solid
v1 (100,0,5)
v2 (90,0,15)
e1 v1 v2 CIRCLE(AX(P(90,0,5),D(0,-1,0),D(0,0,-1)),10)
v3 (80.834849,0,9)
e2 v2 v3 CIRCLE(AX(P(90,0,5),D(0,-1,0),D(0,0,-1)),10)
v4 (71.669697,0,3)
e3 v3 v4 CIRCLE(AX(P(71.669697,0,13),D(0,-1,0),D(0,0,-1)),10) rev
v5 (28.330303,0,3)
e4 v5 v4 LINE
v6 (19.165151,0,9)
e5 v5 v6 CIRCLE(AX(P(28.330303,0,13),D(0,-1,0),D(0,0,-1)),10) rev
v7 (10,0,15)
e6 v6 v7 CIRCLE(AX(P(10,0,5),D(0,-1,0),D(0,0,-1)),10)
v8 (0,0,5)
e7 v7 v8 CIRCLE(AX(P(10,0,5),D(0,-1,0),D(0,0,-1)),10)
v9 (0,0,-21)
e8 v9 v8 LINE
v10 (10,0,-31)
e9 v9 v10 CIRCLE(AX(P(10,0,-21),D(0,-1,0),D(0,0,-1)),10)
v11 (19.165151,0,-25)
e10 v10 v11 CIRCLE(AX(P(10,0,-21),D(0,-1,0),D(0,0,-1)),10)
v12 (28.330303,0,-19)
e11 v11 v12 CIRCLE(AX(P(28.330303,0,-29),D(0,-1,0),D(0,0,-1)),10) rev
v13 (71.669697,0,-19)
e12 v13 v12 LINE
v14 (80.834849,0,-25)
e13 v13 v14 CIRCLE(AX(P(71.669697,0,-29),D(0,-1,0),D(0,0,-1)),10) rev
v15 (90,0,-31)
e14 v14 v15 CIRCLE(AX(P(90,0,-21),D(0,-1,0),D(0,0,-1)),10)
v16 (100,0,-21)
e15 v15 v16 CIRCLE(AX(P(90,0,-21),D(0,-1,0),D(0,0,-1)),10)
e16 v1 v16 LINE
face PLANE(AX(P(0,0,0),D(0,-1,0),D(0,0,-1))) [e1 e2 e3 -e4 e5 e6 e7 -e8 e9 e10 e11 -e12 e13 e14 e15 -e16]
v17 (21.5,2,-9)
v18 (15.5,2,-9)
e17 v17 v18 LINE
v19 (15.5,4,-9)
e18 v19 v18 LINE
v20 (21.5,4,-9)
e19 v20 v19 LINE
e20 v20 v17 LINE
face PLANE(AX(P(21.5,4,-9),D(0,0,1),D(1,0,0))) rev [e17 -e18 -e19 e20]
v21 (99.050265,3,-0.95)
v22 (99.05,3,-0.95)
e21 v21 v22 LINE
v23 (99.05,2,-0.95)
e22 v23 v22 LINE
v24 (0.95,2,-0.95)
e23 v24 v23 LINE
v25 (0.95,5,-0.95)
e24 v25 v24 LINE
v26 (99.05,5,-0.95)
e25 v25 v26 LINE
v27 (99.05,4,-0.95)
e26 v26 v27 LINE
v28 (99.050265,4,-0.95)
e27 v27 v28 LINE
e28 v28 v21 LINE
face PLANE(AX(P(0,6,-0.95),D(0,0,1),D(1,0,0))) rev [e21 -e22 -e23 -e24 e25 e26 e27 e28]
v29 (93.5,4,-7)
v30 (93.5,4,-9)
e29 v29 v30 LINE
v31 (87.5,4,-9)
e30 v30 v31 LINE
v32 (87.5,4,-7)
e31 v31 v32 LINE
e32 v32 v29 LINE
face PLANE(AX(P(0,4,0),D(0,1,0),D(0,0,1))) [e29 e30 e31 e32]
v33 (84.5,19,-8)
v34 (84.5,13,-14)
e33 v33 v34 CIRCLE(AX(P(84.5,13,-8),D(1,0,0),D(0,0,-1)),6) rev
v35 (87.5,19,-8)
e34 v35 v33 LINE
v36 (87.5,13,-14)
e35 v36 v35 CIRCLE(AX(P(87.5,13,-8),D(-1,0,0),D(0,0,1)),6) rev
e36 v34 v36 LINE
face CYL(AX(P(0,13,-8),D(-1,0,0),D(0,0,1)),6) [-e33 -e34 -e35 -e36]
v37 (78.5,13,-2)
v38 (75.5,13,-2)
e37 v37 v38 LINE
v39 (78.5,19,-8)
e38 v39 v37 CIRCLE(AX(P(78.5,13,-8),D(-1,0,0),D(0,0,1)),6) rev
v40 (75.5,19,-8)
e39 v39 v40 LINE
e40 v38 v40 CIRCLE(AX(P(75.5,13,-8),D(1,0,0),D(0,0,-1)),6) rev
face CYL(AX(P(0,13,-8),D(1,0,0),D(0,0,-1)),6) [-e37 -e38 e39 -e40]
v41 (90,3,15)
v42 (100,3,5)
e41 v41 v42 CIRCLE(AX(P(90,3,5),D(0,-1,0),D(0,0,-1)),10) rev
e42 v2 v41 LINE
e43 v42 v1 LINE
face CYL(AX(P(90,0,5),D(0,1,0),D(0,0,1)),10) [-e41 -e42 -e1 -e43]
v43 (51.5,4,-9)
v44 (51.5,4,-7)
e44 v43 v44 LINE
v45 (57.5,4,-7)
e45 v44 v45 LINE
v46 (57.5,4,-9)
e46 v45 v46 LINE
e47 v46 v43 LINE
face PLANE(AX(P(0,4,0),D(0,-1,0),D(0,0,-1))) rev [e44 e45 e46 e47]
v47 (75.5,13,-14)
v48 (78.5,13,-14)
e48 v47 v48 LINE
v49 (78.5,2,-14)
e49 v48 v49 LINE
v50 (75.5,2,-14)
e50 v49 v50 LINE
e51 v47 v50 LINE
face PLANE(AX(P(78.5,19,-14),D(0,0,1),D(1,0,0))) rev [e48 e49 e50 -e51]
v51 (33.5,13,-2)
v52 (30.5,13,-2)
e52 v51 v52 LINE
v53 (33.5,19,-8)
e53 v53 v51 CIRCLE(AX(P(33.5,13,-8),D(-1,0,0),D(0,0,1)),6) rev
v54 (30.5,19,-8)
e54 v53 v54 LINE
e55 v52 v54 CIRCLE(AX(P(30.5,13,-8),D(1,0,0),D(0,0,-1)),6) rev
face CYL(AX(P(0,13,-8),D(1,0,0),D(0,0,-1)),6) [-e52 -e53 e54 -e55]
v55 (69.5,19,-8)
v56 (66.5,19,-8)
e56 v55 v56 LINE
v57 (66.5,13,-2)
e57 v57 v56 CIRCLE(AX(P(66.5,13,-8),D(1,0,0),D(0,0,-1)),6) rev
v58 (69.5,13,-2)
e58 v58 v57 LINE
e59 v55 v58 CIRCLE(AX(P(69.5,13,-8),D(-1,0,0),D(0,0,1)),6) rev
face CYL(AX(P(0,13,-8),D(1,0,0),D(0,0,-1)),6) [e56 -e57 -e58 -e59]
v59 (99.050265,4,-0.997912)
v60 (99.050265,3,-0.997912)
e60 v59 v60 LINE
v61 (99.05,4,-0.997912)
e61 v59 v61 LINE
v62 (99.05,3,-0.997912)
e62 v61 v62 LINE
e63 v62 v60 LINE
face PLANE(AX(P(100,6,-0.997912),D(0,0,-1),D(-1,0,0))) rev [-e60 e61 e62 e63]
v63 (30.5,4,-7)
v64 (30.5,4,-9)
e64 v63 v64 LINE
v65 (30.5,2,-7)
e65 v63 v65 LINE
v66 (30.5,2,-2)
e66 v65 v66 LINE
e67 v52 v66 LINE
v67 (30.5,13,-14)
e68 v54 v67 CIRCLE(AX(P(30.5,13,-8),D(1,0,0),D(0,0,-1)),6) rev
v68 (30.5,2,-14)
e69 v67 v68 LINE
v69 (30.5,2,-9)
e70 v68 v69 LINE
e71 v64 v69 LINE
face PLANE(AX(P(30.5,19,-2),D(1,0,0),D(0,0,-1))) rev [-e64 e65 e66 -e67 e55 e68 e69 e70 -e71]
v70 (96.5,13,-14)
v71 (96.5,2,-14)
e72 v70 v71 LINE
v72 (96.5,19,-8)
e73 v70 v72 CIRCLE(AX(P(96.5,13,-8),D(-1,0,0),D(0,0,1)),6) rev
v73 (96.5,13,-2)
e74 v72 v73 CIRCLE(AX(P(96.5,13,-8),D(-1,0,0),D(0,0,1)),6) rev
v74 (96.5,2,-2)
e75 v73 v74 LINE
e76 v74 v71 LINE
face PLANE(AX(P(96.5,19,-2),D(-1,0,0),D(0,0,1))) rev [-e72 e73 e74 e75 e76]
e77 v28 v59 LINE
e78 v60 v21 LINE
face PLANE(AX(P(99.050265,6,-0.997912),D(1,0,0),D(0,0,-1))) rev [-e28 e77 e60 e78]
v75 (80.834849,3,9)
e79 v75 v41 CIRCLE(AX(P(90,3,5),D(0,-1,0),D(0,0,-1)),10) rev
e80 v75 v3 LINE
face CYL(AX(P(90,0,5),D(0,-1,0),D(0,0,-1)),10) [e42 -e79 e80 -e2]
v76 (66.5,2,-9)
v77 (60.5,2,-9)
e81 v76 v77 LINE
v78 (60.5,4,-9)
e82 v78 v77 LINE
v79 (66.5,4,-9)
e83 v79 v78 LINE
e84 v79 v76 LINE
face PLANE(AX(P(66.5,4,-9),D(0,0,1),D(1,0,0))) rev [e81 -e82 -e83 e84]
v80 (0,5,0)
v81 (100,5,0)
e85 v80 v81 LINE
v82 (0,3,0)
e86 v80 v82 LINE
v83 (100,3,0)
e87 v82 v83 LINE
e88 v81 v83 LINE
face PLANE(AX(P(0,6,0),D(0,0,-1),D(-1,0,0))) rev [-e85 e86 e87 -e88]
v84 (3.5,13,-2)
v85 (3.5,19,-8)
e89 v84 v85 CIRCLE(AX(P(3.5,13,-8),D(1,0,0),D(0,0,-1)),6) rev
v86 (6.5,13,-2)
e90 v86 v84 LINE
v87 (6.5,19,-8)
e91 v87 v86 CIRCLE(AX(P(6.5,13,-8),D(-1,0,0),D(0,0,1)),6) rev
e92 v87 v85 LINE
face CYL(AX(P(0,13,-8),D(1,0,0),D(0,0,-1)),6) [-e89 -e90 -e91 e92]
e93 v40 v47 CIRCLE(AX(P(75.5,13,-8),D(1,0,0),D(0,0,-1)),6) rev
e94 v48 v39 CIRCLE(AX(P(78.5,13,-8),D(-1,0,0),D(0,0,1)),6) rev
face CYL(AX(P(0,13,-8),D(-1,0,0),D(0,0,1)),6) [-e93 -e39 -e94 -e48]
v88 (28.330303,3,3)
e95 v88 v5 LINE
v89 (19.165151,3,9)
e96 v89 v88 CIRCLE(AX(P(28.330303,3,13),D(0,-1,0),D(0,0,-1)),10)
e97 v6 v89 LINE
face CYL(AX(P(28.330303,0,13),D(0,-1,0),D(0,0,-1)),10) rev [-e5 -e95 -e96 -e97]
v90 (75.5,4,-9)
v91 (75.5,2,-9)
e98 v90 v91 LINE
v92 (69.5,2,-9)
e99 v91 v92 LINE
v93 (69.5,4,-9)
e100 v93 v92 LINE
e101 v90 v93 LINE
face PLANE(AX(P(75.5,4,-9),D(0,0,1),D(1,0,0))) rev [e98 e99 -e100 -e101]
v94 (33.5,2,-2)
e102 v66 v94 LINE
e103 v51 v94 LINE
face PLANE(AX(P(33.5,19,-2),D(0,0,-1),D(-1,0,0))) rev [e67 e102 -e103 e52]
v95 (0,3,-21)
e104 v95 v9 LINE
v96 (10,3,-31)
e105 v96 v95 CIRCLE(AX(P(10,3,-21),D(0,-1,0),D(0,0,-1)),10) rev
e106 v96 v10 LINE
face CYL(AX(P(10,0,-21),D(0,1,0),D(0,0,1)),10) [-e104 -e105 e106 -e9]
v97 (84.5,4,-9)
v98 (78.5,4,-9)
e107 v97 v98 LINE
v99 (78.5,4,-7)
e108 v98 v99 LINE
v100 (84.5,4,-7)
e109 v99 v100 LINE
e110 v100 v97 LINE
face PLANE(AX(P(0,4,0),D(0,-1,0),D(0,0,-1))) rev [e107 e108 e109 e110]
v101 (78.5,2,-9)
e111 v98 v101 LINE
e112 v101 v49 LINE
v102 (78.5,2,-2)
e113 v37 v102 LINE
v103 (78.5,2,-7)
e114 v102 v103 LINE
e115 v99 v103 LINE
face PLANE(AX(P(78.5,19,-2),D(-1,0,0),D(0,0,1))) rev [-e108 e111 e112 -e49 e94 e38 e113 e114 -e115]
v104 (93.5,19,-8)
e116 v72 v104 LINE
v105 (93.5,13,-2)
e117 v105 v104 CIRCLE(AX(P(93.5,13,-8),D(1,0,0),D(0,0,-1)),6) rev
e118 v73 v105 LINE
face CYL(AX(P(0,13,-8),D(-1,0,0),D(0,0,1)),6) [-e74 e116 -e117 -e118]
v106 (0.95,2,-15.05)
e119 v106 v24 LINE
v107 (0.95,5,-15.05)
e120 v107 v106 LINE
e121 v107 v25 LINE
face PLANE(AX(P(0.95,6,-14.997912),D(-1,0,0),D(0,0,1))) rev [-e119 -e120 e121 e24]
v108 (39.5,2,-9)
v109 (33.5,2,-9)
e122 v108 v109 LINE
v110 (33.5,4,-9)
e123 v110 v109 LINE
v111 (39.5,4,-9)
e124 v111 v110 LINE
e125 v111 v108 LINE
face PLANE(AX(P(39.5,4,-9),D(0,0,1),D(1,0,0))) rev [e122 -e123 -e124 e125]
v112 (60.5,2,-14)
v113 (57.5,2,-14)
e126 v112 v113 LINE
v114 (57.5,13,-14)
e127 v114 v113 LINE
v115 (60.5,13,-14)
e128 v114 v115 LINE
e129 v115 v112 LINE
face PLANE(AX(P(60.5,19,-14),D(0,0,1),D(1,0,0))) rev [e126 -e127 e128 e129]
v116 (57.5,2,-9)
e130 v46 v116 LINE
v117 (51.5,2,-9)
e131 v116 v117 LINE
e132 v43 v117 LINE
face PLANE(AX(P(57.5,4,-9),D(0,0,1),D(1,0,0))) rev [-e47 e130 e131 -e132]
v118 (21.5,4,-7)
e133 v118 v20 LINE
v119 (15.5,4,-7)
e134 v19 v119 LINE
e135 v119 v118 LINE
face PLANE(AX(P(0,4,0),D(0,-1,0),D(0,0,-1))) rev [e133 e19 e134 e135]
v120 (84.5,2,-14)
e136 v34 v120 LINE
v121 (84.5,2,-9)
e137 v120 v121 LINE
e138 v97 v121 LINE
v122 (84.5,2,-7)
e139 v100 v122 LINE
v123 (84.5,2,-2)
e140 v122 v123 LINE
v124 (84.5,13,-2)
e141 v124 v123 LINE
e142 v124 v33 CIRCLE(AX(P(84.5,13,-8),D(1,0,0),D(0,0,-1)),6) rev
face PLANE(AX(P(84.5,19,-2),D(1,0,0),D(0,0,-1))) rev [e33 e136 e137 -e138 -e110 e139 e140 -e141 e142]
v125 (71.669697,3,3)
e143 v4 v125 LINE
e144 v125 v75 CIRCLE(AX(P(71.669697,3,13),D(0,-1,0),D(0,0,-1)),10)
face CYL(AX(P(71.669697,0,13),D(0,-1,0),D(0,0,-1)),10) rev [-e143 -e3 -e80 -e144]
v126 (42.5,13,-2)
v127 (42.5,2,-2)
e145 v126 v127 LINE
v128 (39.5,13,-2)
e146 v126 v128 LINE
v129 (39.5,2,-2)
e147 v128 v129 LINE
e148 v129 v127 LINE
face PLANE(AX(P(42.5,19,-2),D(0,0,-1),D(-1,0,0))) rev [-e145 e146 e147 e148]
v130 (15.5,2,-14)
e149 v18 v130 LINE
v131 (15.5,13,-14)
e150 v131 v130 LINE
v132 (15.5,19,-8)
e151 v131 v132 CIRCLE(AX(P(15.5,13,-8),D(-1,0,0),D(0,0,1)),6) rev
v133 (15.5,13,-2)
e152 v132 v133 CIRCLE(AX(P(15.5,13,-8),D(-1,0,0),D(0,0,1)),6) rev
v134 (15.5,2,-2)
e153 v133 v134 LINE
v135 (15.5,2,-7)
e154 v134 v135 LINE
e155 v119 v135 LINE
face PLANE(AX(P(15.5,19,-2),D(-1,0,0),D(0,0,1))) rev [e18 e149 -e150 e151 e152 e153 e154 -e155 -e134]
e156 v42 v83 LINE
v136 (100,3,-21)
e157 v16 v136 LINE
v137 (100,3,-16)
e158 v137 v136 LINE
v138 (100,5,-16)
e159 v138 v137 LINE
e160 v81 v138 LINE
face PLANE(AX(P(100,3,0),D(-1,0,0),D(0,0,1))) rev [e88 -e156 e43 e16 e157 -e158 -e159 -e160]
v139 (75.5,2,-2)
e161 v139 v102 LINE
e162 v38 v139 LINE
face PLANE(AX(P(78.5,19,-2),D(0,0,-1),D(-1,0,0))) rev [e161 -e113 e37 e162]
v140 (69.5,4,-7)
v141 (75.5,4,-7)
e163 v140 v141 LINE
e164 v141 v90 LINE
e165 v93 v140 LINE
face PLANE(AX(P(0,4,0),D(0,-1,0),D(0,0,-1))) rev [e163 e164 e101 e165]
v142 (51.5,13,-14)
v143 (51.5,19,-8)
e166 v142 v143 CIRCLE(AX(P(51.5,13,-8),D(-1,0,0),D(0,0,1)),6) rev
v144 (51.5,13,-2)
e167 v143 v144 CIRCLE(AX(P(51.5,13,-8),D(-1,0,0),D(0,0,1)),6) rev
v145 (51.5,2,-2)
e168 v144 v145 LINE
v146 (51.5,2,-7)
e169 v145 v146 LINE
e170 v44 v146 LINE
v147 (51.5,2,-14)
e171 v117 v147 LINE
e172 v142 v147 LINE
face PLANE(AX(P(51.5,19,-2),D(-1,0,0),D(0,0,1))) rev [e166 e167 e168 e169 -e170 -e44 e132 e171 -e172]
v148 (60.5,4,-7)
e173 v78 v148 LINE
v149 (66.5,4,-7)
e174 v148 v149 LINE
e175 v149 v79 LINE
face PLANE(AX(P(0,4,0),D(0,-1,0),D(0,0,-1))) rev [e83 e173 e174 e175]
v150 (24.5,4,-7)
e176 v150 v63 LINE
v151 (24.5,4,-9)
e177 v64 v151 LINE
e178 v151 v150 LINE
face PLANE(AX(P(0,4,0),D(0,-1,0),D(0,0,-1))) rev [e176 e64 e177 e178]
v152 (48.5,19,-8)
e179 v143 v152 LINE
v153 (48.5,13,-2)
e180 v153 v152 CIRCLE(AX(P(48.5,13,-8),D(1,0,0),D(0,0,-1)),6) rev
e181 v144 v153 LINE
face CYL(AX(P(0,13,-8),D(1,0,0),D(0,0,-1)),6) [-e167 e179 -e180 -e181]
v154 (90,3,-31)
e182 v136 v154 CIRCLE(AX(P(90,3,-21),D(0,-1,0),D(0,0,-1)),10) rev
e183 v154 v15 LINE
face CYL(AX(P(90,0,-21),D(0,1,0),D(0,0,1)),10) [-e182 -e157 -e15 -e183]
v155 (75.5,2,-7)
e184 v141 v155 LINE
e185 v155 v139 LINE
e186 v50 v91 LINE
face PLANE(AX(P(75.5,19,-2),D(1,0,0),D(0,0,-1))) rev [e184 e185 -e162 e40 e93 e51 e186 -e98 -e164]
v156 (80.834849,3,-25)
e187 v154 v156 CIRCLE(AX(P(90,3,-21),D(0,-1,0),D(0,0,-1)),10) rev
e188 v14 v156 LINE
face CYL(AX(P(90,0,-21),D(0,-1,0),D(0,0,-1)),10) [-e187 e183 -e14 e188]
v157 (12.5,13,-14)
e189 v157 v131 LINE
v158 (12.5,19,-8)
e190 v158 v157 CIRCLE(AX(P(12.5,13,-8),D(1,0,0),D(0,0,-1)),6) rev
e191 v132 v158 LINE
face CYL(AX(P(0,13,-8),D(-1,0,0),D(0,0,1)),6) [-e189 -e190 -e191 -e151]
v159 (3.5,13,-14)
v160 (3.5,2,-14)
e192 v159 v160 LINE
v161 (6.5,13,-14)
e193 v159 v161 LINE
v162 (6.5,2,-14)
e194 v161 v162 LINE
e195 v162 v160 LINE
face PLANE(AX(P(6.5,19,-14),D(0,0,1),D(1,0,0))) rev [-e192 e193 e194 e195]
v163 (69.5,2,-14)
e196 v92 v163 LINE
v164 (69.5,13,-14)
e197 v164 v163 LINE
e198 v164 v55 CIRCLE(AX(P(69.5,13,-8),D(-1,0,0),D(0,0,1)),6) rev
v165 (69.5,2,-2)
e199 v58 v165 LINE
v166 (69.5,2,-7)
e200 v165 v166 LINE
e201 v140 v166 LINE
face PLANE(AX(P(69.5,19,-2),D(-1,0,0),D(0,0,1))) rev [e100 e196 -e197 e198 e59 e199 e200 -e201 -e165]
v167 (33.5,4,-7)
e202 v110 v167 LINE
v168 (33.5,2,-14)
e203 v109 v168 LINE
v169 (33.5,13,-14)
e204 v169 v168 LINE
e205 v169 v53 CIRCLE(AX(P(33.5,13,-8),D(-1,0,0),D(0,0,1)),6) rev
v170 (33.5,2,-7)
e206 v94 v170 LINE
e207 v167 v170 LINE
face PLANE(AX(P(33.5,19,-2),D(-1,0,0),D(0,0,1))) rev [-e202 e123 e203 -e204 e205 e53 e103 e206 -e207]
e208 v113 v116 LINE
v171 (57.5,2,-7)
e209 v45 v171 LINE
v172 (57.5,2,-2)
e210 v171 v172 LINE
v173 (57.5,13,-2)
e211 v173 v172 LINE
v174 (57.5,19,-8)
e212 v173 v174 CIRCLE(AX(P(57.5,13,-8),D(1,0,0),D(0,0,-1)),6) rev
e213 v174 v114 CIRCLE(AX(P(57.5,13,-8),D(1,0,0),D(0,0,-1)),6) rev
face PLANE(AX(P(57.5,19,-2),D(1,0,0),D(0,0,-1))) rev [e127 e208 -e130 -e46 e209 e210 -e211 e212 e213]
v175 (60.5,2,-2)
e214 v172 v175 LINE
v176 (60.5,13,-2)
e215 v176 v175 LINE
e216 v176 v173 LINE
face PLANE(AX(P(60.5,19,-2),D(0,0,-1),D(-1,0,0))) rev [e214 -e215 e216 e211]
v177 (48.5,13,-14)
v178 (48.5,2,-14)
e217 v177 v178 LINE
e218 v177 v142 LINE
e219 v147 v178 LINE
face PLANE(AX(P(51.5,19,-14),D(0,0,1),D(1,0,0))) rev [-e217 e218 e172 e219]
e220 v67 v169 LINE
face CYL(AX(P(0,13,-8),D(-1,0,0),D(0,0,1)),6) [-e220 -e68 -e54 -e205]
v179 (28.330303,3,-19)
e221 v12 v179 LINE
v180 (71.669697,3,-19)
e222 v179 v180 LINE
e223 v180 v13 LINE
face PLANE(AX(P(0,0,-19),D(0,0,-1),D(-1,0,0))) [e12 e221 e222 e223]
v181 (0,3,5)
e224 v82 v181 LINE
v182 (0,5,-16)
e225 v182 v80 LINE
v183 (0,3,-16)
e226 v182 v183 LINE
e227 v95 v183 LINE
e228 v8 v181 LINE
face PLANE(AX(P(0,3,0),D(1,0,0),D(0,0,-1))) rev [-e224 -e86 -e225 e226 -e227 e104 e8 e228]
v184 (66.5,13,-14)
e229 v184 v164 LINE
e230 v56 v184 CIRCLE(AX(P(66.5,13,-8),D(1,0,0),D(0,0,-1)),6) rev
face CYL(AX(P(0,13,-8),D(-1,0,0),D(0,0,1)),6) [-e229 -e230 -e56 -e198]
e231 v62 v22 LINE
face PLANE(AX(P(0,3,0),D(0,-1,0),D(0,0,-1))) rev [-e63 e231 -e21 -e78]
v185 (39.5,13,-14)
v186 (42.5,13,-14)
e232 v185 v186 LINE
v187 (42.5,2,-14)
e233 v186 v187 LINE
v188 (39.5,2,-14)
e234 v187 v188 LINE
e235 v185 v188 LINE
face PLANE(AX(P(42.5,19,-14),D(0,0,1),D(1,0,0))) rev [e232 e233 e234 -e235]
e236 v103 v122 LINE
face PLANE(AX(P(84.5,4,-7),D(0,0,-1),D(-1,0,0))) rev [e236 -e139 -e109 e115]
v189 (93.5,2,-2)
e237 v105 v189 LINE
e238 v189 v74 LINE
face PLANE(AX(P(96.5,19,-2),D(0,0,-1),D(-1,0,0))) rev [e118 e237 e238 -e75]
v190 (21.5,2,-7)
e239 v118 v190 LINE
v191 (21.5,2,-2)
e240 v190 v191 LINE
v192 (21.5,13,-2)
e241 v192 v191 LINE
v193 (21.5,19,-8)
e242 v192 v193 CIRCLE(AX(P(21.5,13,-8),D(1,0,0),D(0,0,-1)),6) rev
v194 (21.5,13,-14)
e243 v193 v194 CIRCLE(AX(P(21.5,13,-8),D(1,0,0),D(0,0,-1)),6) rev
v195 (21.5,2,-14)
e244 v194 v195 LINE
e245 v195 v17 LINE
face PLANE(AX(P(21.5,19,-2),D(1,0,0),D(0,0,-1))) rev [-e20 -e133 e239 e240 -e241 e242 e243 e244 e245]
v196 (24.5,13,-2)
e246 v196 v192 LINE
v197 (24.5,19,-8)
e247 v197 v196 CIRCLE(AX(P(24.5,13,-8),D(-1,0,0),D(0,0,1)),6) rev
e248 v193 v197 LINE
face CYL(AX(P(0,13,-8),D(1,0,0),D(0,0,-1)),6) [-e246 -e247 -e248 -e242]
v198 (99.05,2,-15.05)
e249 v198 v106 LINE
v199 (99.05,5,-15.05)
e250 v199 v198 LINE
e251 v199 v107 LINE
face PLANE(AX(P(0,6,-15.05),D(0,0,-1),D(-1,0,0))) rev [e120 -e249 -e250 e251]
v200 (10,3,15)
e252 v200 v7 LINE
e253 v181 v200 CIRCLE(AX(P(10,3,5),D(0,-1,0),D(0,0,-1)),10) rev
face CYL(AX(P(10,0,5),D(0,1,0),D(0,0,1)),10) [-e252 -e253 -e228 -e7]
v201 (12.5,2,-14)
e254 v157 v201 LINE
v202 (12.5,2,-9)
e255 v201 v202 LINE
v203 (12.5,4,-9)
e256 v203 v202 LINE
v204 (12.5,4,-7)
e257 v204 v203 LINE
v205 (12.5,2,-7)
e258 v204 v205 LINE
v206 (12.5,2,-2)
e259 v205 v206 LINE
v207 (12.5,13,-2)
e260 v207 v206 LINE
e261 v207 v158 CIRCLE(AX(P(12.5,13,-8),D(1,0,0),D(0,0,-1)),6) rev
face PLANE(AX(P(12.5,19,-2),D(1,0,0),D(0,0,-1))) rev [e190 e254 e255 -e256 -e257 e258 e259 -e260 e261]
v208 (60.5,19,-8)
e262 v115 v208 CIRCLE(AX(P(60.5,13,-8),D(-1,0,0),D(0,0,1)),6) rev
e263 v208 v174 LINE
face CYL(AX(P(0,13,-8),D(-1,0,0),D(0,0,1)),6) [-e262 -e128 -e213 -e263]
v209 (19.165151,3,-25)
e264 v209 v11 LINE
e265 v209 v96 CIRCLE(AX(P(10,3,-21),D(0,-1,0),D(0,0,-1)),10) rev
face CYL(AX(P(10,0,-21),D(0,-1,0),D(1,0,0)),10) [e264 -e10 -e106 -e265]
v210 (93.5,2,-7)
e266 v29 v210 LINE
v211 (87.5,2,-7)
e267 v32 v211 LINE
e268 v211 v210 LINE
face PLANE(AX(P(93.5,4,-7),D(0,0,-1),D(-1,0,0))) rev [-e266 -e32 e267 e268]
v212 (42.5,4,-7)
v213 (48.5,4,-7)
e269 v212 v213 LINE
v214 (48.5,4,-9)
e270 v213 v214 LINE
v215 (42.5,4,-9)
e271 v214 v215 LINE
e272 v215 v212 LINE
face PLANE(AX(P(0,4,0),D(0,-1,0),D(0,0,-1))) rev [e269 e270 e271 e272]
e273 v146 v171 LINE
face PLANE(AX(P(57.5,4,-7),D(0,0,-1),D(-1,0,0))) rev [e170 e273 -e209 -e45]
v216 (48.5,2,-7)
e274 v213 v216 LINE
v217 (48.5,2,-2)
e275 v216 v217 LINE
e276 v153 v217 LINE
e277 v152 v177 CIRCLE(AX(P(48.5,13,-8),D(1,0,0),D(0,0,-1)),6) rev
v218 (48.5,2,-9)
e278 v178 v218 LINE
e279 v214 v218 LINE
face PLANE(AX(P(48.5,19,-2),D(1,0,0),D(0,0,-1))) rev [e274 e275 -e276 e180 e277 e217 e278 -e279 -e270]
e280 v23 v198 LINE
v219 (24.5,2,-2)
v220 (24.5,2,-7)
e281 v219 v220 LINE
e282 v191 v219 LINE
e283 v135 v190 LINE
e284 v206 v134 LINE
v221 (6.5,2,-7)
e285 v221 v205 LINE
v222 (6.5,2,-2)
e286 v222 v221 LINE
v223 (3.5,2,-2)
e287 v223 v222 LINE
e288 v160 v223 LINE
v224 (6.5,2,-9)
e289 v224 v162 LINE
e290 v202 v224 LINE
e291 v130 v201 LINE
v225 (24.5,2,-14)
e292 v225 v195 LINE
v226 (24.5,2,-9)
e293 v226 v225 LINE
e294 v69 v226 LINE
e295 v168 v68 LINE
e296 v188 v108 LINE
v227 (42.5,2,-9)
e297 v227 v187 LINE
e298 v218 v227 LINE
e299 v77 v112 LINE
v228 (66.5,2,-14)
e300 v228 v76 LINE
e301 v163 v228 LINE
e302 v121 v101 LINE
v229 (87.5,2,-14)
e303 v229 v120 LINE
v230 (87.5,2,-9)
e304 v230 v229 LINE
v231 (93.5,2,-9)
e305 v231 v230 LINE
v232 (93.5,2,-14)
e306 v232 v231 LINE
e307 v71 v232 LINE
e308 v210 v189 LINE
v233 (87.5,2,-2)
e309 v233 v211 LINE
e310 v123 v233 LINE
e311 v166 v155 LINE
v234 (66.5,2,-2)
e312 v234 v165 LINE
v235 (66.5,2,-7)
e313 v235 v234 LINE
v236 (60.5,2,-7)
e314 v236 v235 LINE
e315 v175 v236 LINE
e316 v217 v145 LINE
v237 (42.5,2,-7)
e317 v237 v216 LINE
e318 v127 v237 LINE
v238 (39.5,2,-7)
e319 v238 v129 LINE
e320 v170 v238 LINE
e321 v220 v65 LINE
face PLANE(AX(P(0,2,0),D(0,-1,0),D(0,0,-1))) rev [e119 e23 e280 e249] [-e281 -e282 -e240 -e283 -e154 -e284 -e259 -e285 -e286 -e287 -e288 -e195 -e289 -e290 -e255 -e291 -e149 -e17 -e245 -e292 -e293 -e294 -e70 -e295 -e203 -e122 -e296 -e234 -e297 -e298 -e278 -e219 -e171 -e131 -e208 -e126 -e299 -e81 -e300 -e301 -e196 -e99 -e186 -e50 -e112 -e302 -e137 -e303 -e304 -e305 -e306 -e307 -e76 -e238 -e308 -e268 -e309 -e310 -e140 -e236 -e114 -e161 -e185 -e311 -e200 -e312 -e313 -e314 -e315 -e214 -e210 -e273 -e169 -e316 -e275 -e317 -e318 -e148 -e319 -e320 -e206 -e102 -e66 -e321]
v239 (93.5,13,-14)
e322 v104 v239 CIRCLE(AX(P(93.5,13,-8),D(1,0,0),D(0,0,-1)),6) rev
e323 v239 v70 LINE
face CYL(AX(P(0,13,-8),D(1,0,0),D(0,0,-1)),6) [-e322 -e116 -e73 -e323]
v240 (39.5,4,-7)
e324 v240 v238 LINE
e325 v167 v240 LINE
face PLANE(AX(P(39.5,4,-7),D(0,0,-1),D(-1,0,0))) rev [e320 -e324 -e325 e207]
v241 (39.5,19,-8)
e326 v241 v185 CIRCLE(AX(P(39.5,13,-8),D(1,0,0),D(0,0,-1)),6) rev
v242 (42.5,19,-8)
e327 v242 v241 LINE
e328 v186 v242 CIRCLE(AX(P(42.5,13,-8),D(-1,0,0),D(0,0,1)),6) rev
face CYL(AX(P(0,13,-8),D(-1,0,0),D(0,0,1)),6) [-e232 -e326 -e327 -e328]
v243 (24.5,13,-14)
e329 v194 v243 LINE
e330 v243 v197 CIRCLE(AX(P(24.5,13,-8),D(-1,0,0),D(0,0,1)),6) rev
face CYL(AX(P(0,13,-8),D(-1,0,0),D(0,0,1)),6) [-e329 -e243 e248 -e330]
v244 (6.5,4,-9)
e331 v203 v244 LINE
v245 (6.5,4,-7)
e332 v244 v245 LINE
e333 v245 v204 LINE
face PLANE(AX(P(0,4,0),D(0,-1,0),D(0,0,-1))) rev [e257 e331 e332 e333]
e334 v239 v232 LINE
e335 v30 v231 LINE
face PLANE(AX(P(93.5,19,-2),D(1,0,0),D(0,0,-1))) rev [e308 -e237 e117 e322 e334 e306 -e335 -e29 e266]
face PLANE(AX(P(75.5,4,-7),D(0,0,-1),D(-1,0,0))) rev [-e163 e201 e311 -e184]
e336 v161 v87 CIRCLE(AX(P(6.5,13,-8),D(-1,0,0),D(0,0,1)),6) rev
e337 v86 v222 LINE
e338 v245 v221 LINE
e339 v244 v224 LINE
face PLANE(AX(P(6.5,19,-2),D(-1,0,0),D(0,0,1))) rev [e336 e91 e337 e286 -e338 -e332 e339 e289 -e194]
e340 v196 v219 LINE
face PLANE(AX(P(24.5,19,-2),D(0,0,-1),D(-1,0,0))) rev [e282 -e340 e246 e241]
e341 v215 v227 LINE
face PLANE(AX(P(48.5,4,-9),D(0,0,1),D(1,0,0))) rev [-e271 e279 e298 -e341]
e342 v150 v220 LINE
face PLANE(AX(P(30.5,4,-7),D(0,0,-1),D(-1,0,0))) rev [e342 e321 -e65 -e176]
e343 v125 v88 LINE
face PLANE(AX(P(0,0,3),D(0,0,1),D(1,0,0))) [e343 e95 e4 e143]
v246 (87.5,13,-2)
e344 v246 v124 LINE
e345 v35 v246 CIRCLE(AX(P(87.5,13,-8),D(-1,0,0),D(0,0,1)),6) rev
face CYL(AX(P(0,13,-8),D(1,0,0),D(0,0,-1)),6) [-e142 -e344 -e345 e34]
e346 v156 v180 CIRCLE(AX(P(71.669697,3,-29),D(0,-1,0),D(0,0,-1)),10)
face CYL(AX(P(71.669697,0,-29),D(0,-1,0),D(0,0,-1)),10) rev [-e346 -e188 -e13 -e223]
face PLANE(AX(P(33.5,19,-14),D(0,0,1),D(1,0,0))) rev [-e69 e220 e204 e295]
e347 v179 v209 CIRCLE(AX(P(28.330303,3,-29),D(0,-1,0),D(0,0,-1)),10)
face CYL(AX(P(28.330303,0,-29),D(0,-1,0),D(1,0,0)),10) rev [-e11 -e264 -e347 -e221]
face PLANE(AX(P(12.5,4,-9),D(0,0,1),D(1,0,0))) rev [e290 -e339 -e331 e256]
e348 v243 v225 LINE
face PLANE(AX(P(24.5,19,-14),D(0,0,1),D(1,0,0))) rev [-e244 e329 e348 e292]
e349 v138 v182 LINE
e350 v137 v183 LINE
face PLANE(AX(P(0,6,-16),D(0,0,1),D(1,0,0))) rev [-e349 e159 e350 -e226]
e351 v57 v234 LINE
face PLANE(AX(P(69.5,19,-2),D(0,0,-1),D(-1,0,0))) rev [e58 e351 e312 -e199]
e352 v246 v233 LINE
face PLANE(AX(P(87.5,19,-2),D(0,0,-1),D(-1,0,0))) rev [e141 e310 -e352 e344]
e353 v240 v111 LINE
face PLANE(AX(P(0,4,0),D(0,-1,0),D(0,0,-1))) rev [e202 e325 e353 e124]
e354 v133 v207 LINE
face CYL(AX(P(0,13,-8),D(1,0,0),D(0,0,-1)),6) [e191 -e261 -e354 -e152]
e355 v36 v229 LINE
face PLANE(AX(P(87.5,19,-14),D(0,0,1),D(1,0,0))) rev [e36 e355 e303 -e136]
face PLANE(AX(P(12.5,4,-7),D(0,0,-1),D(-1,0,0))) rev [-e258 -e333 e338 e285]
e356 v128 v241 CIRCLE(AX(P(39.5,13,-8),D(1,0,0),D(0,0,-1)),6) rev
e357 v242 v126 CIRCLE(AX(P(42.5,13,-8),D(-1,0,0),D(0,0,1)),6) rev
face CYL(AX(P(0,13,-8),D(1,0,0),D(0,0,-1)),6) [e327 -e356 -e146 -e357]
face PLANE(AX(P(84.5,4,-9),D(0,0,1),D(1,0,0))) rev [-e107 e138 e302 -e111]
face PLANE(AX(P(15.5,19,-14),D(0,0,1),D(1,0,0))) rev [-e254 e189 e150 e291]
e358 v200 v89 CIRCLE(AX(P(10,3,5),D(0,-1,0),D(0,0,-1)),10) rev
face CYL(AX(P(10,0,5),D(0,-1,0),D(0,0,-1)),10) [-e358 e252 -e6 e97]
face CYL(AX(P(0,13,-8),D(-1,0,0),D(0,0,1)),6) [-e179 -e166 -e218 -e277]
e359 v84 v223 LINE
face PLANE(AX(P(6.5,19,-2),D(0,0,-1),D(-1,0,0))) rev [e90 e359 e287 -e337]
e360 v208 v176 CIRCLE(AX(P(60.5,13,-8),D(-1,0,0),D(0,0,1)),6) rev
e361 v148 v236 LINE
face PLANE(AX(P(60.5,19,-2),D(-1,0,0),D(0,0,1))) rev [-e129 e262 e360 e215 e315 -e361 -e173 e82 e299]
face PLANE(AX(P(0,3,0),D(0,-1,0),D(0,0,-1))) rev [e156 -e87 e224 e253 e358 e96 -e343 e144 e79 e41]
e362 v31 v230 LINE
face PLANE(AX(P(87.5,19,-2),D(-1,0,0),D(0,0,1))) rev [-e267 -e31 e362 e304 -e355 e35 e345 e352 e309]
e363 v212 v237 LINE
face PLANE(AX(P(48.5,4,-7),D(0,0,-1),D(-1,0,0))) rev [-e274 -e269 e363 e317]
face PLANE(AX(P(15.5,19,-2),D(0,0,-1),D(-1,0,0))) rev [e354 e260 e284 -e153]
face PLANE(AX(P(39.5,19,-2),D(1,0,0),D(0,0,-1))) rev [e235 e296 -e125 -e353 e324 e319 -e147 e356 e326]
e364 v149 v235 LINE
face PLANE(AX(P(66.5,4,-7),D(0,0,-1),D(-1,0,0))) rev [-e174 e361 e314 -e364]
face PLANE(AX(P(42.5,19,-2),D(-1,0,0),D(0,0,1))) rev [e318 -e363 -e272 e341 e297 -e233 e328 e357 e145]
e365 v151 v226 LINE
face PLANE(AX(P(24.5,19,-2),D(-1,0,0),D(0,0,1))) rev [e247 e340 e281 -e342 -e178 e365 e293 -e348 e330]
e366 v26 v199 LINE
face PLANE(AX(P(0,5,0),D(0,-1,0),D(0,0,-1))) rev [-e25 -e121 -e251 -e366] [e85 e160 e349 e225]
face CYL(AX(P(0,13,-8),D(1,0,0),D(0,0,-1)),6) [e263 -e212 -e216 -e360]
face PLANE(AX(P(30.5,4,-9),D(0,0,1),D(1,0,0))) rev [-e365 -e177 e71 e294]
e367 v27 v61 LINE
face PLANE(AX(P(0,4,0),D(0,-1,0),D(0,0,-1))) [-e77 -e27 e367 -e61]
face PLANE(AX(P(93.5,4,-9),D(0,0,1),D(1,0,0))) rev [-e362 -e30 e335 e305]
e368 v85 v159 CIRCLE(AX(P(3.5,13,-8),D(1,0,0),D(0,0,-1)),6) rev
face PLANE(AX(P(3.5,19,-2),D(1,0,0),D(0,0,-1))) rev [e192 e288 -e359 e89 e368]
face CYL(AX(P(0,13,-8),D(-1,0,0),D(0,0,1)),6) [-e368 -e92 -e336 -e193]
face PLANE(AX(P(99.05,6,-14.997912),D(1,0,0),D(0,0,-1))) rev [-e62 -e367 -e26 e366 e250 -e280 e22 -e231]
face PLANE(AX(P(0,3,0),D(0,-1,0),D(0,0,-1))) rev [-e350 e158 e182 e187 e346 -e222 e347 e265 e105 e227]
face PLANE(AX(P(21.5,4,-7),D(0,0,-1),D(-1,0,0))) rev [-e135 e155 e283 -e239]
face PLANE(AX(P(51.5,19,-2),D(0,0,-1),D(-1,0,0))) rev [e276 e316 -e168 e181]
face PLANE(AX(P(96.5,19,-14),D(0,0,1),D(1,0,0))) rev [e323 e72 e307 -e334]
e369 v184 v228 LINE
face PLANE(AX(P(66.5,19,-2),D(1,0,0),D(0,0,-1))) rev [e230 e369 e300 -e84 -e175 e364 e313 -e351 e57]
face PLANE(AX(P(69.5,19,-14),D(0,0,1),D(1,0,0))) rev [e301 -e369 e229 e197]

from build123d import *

# Parameters (mm, degrees)
SKETCH1_W            = 100
SKETCH1_H            = 16
BOSS_EXTRUDE1_DEPTH  = 3
SKETCH2_W            = 98
SKETCH2_H            = 14
CUT_EXTRUDE1_DEPTH   = 1
SKETCH5_W            = 20
SKETCH5_H            = 3
BOSS_EXTRUDE4_DEPTH  = 15
SKETCH6_W            = 20
SKETCH6_H            = 3
BOSS_EXTRUDE5_DEPTH  = 15
FILLET18_R           = 10
SKETCH7_W            = 3
SKETCH7_H            = 12
BOSS_EXTRUDE6_DEPTH  = 17
SKETCH8_W            = 6
SKETCH8_H            = 2
BOSS_EXTRUDE7_DEPTH  = 2
FILLET19_R           = 6
SKETCH10_W           = 60
SKETCH10_H           = 3
BOSS_EXTRUDE8_DEPTH  = 3
SKETCH11_W           = 60
SKETCH11_H           = 3
BOSS_EXTRUDE9_DEPTH  = 3
SKETCH12_W           = 0.95
SKETCH12_H           = 14
BOSS_EXTRUDE10_DEPTH = 3
SKETCH13_W           = 100
SKETCH13_H           = 0.95
BOSS_EXTRUDE11_DEPTH = 3
SKETCH14_W           = 0.95
SKETCH14_H           = 0.052088128
BOSS_EXTRUDE12_DEPTH = 3
SKETCH15_W           = 0.95
SKETCH15_H           = 0.047911872
SKETCH15_W_2         = 0.949734752
SKETCH15_H_2         = 0.052088128
BOSS_EXTRUDE13_DEPTH = 3
FILLET20_R           = 10
SKETCH17_W           = 98.1
SKETCH17_H           = 14.1
SKETCH17_W_2         = 97.1
SKETCH17_H_2         = 13.1
CUT_EXTRUDE2_DEPTH   = 4
SKETCH18_W           = 100
SKETCH18_H           = 16.05
SKETCH18_W_2         = 98
SKETCH18_H_2         = 14.05
CUT_EXTRUDE3_DEPTH   = 2
SKETCH19_W           = 100
SKETCH19_H           = 16
SKETCH19_W_2         = 98.1
SKETCH19_H_2         = 14.1
BOSS_EXTRUDE14_DEPTH = 1


with BuildPart() as part:
    # Sketch1 → Boss-Extrude1 (new body)
    with BuildSketch(Plane(origin=(0, 0, 0), x_dir=(1, 0, 0), z_dir=(0, 1, 0))):
        with Locations((50, 8)):
            Rectangle(SKETCH1_W, SKETCH1_H)
    extrude(amount=BOSS_EXTRUDE1_DEPTH)

    # Sketch2 → Cut-Extrude1 (cut)
    with BuildSketch(Plane(origin=(0, 3, 0), x_dir=(1, 0, 0), z_dir=(0, 1, 0))):
        with Locations((50, 8)):
            Rectangle(SKETCH2_W, SKETCH2_H)
    extrude(amount=-CUT_EXTRUDE1_DEPTH, mode=Mode.SUBTRACT)

    # Sketch5 → Boss-Extrude4 (add)
    with BuildSketch(Plane.XY):
        with Locations((10, 1.5)):
            Rectangle(SKETCH5_W, SKETCH5_H)
        with Locations((90, 1.5)):
            Rectangle(SKETCH5_W, SKETCH5_H)
    extrude(amount=BOSS_EXTRUDE4_DEPTH)

    # Sketch6 → Boss-Extrude5 (add)
    with BuildSketch(Plane(origin=(0, 0, -16), x_dir=(-1, 0, 0), z_dir=(0, 0, -1))):
        with Locations((-90, 1.5)):
            Rectangle(SKETCH6_W, SKETCH6_H)
        with Locations((-10, 1.5)):
            Rectangle(SKETCH6_W, SKETCH6_H)
    extrude(amount=BOSS_EXTRUDE5_DEPTH)

    # Fillet18
    fillet18_edges = [part.edges().sort_by_distance(p)[0] for p in [
        (20, 1.5, 15),
        (0, 1.5, 15),
        (80, 1.5, 15),
        (100, 1.5, 15),
        (0, 1.5, -31),
        (20, 1.5, -31),
        (80, 1.5, -31),
        (100, 1.5, -31),
    ]]
    fillet(fillet18_edges, radius=FILLET18_R - 0.0001)  # a hair under: the kernel refuses the full size

    # Sketch7 → Boss-Extrude6 (add)
    with BuildSketch(Plane(origin=(0, 2, 0), x_dir=(1, 0, 0), z_dir=(0, 1, 0))):
        with Locations((95, 8)):
            Rectangle(SKETCH7_W, SKETCH7_H)
        with Locations((86, 8)):
            Rectangle(SKETCH7_W, SKETCH7_H)
        with Locations((77, 8)):
            Rectangle(SKETCH7_W, SKETCH7_H)
        with Locations((68, 8)):
            Rectangle(SKETCH7_W, SKETCH7_H)
        with Locations((59, 8)):
            Rectangle(SKETCH7_W, SKETCH7_H)
        with Locations((50, 8)):
            Rectangle(SKETCH7_W, SKETCH7_H)
        with Locations((41, 8)):
            Rectangle(SKETCH7_W, SKETCH7_H)
        with Locations((32, 8)):
            Rectangle(SKETCH7_W, SKETCH7_H)
        with Locations((23, 8)):
            Rectangle(SKETCH7_W, SKETCH7_H)
        with Locations((14, 8)):
            Rectangle(SKETCH7_W, SKETCH7_H)
        with Locations((5, 8)):
            Rectangle(SKETCH7_W, SKETCH7_H)
    extrude(amount=BOSS_EXTRUDE6_DEPTH)

    # Sketch8 → Boss-Extrude7 (add)
    with BuildSketch(Plane(origin=(0, 2, 0), x_dir=(1, 0, 0), z_dir=(0, 1, 0))):
        with Locations((90.5, 8)):
            Rectangle(SKETCH8_W, SKETCH8_H)
        with Locations((81.5, 8)):
            Rectangle(SKETCH8_W, SKETCH8_H)
        with Locations((72.5, 8)):
            Rectangle(SKETCH8_W, SKETCH8_H)
        with Locations((63.5, 8)):
            Rectangle(SKETCH8_W, SKETCH8_H)
        with Locations((54.5, 8)):
            Rectangle(SKETCH8_W, SKETCH8_H)
        with Locations((45.5, 8)):
            Rectangle(SKETCH8_W, SKETCH8_H)
        with Locations((36.5, 8)):
            Rectangle(SKETCH8_W, SKETCH8_H)
        with Locations((27.5, 8)):
            Rectangle(SKETCH8_W, SKETCH8_H)
        with Locations((18.5, 8)):
            Rectangle(SKETCH8_W, SKETCH8_H)
        with Locations((9.5, 8)):
            Rectangle(SKETCH8_W, SKETCH8_H)
    extrude(amount=BOSS_EXTRUDE7_DEPTH)

    # Fillet19
    fillet19_edges = [part.edges().sort_by_distance(p)[0] for p in [
        (95, 19, -2),
        (95, 19, -14),
        (86, 19, -2),
        (86, 19, -14),
        (77, 19, -2),
        (77, 19, -14),
        (68, 19, -2),
        (68, 19, -14),
        (59, 19, -2),
        (59, 19, -14),
        (50, 19, -2),
        (50, 19, -14),
        (41, 19, -2),
        (41, 19, -14),
        (32, 19, -2),
        (32, 19, -14),
        (23, 19, -14),
        (23, 19, -2),
        (14, 19, -2),
        (14, 19, -14),
        (5, 19, -2),
        (5, 19, -14),
    ]]
    fillet(fillet19_edges, radius=FILLET19_R - 0.0001)  # a hair under: the kernel refuses the full size

    # Sketch10 → Boss-Extrude8 (add)
    with BuildSketch(Plane(origin=(0, 0, -16), x_dir=(-1, 0, 0), z_dir=(0, 0, -1))):
        with Locations((-50, 1.5)):
            Rectangle(SKETCH10_W, SKETCH10_H)
    extrude(amount=BOSS_EXTRUDE8_DEPTH)

    # Sketch11 → Boss-Extrude9 (add)
    with BuildSketch(Plane.XY):
        with Locations((50, 1.5)):
            Rectangle(SKETCH11_W, SKETCH11_H)
    extrude(amount=BOSS_EXTRUDE9_DEPTH)

    # Sketch12 → Boss-Extrude10 (add)
    with BuildSketch(Plane(origin=(0, 3, 0), x_dir=(1, 0, 0), z_dir=(0, 1, 0))):
        with Locations((99.525, 7.997911872)):
            Rectangle(SKETCH12_W, SKETCH12_H)
        with Locations((0.475, 7.997911872)):
            Rectangle(SKETCH12_W, SKETCH12_H)
    extrude(amount=BOSS_EXTRUDE10_DEPTH)

    # Sketch13 → Boss-Extrude11 (add)
    with BuildSketch(Plane(origin=(0, 3, 0), x_dir=(1, 0, 0), z_dir=(0, 1, 0))):
        with Locations((50, 15.525)):
            Rectangle(SKETCH13_W, SKETCH13_H)
        with Locations((50, 0.475)):
            Rectangle(SKETCH13_W, SKETCH13_H)
    extrude(amount=BOSS_EXTRUDE11_DEPTH)

    # Sketch14 → Boss-Extrude12 (add)
    with BuildSketch(Plane(origin=(0, 3, 0), x_dir=(1, 0, 0), z_dir=(0, 1, 0))):
        with Locations((0.475, 15.023955936)):
            Rectangle(SKETCH14_W, SKETCH14_H)
    extrude(amount=BOSS_EXTRUDE12_DEPTH)

    # Sketch15 → Boss-Extrude13 (add)
    with BuildSketch(Plane(origin=(0, 3, 0), x_dir=(1, 0, 0), z_dir=(0, 1, 0))):
        with Locations((0.475, 0.973955936)):
            Rectangle(SKETCH15_W, SKETCH15_H)
        with Locations((99.525132624, 0.973955936)):
            Rectangle(SKETCH15_W_2, SKETCH15_H)
        with Locations((99.525, 15.023955936)):
            Rectangle(SKETCH15_W, SKETCH15_H_2)
    extrude(amount=BOSS_EXTRUDE13_DEPTH)

    # Fillet20
    fillet20_edges = [part.edges().sort_by_distance(p)[0] for p in [
        (20, 1.5, -19),
        (80, 1.5, -19),
        (80, 1.5, 3),
        (20, 1.5, 3),
    ]]
    fillet(fillet20_edges, radius=FILLET20_R)

    # Sketch17 → Cut-Extrude2 (cut)
    with BuildSketch(Plane(origin=(0, 6, 0), x_dir=(1, 0, 0), z_dir=(0, 1, 0))):
        with Locations((50, 8)):
            Rectangle(SKETCH17_W, SKETCH17_H)
        with Locations((50, 8)):
            Rectangle(SKETCH17_W_2, SKETCH17_H_2, mode=Mode.SUBTRACT)
    extrude(amount=-CUT_EXTRUDE2_DEPTH, mode=Mode.SUBTRACT)

    # Sketch18 → Cut-Extrude3 (cut)
    with BuildSketch(Plane(origin=(0, 6, 0), x_dir=(1, 0, 0), z_dir=(0, 1, 0))):
        with Locations((50, 7.975)):
            Rectangle(SKETCH18_W, SKETCH18_H)
        with Locations((50, 7.975)):
            Rectangle(SKETCH18_W_2, SKETCH18_H_2, mode=Mode.SUBTRACT)
    extrude(amount=-CUT_EXTRUDE3_DEPTH, mode=Mode.SUBTRACT)

    # Sketch19 → Boss-Extrude14 (add)
    with BuildSketch(Plane(origin=(0, 4, 0), x_dir=(1, 0, 0), z_dir=(0, 1, 0))):
        with Locations((50, 8)):
            Rectangle(SKETCH19_W, SKETCH19_H)
        with Locations((50, 8)):
            Rectangle(SKETCH19_W_2, SKETCH19_H_2, mode=Mode.SUBTRACT)
    extrude(amount=BOSS_EXTRUDE14_DEPTH)


solid = part.part
